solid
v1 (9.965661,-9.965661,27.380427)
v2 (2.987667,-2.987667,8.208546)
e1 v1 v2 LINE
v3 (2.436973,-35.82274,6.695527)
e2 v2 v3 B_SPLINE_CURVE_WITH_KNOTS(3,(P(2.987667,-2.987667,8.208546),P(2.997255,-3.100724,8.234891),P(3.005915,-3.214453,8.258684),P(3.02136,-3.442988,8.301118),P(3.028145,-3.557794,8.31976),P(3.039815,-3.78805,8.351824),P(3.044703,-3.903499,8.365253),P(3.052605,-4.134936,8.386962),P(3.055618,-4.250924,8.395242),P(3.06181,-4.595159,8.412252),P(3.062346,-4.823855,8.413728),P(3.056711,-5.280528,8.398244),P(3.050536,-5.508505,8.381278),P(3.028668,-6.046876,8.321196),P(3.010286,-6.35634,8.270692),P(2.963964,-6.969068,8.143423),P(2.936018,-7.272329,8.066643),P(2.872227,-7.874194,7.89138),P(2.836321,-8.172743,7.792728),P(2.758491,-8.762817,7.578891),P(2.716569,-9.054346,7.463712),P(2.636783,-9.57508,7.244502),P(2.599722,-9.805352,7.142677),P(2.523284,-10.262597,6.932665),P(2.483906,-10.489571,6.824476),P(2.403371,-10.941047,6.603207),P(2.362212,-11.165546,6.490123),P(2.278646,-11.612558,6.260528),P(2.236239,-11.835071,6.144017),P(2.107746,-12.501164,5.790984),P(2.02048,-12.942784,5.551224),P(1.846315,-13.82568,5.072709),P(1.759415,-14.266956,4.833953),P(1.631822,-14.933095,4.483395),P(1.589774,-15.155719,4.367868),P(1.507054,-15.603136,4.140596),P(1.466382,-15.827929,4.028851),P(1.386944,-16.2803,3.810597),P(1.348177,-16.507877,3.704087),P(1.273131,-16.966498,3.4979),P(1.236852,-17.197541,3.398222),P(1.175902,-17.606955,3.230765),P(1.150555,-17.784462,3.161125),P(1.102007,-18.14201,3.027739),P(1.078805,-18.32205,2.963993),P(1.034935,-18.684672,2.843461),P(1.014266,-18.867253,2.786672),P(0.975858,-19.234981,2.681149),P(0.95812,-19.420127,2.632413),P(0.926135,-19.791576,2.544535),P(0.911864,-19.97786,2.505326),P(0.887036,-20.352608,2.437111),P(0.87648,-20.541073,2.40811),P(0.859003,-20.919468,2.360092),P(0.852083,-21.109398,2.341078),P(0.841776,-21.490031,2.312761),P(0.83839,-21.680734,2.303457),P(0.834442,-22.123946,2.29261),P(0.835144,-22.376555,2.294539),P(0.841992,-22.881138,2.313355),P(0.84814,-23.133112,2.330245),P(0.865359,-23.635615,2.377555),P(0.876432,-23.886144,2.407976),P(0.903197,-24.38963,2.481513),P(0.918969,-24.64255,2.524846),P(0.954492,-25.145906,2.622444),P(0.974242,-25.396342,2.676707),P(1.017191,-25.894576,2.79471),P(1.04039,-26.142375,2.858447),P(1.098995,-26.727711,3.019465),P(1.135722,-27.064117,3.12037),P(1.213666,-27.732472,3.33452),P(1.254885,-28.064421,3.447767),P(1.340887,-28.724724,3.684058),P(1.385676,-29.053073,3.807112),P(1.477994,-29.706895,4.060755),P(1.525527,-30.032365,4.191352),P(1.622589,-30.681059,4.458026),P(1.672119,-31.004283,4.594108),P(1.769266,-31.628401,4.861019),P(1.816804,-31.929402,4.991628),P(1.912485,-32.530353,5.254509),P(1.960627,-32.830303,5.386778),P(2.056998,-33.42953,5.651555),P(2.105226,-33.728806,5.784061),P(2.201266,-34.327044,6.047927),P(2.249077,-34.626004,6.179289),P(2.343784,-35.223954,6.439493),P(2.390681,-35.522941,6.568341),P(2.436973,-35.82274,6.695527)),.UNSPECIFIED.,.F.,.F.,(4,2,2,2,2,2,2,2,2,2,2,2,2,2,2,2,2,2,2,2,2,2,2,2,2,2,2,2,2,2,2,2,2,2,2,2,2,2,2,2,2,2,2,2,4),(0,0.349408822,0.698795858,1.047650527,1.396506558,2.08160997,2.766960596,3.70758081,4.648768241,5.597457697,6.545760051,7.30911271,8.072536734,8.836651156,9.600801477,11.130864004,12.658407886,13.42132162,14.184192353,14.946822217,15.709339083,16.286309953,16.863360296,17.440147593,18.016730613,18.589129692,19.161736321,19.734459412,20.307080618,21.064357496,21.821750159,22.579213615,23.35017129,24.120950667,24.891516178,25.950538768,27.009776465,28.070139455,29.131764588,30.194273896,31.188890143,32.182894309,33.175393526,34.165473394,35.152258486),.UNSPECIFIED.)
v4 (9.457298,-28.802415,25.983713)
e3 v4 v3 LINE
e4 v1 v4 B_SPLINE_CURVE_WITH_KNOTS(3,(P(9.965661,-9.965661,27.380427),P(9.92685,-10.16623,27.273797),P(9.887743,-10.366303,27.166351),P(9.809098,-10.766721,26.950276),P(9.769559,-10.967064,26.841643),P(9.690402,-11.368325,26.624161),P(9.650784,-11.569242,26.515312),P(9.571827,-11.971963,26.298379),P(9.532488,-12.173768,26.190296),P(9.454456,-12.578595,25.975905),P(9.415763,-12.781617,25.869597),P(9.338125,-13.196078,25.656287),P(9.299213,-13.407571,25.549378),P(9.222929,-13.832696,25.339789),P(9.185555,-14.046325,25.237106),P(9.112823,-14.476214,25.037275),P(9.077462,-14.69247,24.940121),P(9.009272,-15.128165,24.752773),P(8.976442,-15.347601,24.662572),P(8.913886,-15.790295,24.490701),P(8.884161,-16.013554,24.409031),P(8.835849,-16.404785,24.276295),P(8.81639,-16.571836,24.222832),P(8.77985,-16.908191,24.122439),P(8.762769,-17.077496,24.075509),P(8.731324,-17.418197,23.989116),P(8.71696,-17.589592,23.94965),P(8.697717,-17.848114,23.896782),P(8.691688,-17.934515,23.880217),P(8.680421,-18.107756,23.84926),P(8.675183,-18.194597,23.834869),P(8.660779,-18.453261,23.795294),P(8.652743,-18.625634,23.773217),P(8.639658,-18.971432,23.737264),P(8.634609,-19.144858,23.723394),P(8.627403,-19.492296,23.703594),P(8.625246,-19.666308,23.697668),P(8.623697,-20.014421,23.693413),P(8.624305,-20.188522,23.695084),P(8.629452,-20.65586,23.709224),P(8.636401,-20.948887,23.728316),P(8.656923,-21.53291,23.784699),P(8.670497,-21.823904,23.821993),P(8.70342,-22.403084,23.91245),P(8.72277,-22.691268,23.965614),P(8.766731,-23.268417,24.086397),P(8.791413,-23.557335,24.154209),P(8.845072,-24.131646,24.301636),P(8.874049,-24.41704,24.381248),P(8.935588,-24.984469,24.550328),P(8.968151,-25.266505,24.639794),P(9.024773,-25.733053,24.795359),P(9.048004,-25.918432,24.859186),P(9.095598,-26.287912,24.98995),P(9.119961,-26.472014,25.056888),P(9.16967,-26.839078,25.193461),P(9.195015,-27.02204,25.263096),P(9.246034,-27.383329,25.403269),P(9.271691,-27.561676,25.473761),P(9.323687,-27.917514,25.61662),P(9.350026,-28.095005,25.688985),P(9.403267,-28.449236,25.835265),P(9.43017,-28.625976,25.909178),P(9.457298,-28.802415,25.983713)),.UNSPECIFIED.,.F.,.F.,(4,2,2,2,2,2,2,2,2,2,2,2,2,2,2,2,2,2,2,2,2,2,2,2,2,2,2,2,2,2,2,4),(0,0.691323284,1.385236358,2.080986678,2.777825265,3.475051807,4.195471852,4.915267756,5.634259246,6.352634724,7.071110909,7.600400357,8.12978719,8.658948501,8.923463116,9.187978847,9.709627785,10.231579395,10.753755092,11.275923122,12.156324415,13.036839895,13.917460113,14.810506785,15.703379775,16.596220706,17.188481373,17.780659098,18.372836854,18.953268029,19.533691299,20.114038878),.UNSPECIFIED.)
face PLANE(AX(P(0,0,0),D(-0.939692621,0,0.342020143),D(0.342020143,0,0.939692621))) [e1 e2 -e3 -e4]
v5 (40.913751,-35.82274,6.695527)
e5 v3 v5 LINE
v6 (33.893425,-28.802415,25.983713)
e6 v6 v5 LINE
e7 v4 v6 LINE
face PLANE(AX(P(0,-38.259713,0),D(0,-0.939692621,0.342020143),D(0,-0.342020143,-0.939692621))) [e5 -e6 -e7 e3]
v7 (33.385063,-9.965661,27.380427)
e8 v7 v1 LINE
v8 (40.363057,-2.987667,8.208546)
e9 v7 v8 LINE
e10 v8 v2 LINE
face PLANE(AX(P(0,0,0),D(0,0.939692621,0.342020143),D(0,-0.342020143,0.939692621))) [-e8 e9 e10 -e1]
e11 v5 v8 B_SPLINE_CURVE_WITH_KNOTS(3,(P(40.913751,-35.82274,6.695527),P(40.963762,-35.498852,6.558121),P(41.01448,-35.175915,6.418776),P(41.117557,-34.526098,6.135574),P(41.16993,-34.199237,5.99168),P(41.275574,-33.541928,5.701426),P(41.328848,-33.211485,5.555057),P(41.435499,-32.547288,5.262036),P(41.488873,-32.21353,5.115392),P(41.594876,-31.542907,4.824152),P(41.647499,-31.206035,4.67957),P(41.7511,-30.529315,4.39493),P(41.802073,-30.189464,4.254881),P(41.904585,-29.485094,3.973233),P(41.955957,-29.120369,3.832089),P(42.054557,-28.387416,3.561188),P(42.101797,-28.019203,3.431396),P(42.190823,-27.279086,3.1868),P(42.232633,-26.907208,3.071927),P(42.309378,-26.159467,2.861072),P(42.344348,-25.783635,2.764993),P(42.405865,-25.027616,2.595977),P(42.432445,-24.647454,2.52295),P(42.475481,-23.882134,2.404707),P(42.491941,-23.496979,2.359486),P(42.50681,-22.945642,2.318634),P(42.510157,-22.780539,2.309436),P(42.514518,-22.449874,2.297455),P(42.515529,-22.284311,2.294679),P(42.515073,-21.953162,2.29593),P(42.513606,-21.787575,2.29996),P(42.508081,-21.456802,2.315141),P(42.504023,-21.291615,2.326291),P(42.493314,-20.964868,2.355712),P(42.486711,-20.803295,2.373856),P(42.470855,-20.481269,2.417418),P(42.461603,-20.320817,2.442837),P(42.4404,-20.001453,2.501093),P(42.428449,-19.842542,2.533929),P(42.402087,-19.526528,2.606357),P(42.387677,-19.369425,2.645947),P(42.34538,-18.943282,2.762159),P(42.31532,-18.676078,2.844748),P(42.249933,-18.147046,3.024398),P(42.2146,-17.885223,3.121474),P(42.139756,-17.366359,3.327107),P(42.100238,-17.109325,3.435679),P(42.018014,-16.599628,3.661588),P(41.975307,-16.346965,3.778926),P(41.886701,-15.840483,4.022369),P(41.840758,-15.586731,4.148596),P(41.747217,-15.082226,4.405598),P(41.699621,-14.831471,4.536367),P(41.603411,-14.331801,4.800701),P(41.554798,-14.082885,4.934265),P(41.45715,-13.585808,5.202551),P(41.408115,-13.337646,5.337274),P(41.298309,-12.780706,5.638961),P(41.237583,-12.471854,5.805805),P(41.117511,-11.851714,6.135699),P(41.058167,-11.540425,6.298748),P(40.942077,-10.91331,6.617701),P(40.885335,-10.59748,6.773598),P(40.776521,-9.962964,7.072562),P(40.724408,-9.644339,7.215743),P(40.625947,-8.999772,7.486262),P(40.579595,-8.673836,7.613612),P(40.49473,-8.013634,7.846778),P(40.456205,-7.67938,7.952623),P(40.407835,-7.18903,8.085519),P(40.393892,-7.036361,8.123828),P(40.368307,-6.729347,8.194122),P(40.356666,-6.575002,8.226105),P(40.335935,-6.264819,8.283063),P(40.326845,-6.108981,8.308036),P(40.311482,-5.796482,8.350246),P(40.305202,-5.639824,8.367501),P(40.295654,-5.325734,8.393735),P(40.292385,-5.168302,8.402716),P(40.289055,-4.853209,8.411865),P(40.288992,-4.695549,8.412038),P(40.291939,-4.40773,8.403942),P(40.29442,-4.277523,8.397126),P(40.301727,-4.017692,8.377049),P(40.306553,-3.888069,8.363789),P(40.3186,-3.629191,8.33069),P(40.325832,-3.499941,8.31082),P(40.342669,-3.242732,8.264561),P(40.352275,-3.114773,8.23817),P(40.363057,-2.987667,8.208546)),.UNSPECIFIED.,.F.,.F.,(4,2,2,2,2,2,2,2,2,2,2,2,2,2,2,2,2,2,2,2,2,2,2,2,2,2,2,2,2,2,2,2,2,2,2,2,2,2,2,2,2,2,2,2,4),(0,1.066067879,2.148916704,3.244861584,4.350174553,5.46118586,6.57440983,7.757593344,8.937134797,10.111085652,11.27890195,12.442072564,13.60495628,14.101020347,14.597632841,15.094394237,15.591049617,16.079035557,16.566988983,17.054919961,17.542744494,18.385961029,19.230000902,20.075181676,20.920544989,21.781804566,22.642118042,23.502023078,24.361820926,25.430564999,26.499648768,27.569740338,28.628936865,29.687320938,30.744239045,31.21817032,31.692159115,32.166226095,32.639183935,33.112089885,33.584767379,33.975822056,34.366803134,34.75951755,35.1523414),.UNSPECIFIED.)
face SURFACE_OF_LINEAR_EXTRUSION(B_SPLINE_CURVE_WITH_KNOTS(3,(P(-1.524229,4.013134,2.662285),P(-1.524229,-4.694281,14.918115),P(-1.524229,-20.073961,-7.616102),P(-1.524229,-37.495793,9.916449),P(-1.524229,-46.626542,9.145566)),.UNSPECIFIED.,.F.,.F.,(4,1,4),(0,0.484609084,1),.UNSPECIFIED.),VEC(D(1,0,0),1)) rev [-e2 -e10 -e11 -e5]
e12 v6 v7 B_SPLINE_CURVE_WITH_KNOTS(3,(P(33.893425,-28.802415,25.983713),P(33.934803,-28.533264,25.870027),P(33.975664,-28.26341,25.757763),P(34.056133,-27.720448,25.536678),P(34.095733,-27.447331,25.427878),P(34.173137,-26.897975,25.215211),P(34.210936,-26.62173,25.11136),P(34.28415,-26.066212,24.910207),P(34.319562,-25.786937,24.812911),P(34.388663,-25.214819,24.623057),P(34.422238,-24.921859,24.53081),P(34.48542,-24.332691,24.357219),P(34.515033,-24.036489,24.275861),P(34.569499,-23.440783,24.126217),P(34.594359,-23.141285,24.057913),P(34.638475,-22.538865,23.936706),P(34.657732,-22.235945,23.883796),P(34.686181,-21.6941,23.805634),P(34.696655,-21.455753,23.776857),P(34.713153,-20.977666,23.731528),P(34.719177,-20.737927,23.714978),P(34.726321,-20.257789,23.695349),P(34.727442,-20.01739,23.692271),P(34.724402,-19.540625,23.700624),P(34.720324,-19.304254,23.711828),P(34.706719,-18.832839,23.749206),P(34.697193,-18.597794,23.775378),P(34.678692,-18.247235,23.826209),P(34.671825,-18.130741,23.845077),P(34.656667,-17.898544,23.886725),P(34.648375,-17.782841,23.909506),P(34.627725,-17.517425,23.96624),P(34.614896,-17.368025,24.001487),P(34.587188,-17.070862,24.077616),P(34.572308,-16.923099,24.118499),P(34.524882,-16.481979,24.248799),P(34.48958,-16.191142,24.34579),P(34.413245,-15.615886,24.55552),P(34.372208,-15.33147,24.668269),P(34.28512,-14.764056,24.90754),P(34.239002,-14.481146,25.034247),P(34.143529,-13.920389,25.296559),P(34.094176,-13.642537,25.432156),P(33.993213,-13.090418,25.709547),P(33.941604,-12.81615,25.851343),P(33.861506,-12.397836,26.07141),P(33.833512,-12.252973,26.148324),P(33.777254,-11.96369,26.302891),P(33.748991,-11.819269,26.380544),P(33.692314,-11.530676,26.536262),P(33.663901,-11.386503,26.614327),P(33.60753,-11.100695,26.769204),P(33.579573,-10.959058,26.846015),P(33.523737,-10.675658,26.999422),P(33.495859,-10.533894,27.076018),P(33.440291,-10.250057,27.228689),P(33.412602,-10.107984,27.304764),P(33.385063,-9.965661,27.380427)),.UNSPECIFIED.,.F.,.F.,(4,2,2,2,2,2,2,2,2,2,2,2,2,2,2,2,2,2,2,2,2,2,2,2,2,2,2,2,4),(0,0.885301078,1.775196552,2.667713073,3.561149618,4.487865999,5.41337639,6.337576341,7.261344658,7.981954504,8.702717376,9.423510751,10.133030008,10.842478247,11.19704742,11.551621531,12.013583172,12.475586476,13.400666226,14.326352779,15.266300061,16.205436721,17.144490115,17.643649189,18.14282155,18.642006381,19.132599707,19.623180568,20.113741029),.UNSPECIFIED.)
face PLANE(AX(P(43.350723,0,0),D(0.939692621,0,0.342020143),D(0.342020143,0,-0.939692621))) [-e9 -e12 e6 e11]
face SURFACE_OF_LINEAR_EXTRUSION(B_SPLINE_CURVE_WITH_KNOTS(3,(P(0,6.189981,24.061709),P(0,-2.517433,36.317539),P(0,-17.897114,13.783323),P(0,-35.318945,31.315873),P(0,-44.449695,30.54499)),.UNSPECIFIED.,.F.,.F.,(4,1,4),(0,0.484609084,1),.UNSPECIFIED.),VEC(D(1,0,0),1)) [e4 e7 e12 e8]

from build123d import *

# Parameters (mm, degrees)
F_1_FR_W        = 43.350723316
F_1_FR_H        = 38.259713105
EXTRUDE_1_DEPTH = 20
EXTRUDE_1_TAPER = 20
OTHER_START     = -1
OTHER_1_DEPTH   = 45
OTHER_START_2   = 7.279404685
OTHER_1_2_DEPTH = 28.791913946
OTHER_START_3   = -35.822740595
OTHER_1_3_DEPTH = 32.835074171


with BuildPart() as part:
    # Эскиз1_fr → Бобышка-Вытянуть1 (new body)
    with BuildSketch(Plane.XY):
        with Locations((21.675361658, -19.129856553)):
            Rectangle(F_1_FR_W, F_1_FR_H)
    extrude(amount=EXTRUDE_1_DEPTH, taper=EXTRUDE_1_TAPER)

    # Заменить грань1: read off the stored shape, not the designer's step
    # Заменить грань1 outline → Заменить грань1 (cut)
    with BuildSketch(Plane.YZ.offset(OTHER_START)):
        with BuildLine():
            Line((0, 0), (-2.987666524, 8.208546313))
            add(Edge.make_bspline(
                [(-2.987666524, 8.208546313), (-8.870550538, 9.578826995), (-19.207758762, -1.740918138), (-30.435430933, 4.410138177), (-35.822740495, 6.695527216)],
                knots=[0.134570032, 0.134570032, 0.134570032, 0.134570032, 0.484609084, 0.79490495, 0.79490495, 0.79490495, 0.79490495], degree=3))
            Line((-35.822740495, 6.695527216), (-38.259713105, 0))
            Line((-38.259713105, 0), (0, 0))
        make_face()
    extrude(amount=OTHER_1_DEPTH, mode=Mode.SUBTRACT)

    # Other 1 2 outline → Other 1 2 (add)
    with BuildSketch(Plane.YZ.offset(OTHER_START_2)):
        with BuildLine():
            Line((-7.279404685, 20), (-9.965660529, 27.380427273))
            add(Edge.make_bspline(
                [(-9.965660529, 27.380427273), (-12.601354954, 25.979247634), (-18.69943354, 22.300628932), (-25.092854244, 24.416589038), (-28.802415021, 25.983712933)],
                knots=[0.320991938, 0.320991938, 0.320991938, 0.320991938, 0.484609084, 0.701285336, 0.701285336, 0.701285336, 0.701285336], degree=3))
            Line((-28.802415021, 25.983712933), (-30.980308419, 20))
            Line((-30.980308419, 20), (-7.279404685, 20))
        make_face()
    extrude(amount=OTHER_1_2_DEPTH)

    # Other 1 3 outline → Other 1 3 (cut)
    with BuildSketch(Plane(origin=(0, 0, 0), x_dir=(1, 0, 0), z_dir=(0, 1, 0)).offset(OTHER_START_3)):
        Polygon((9.965660529, -27.380427273), (7.279404685, -20), (7.279404685, -29), (10.555136794, -29), align=None)
        Polygon((33.385062787, -27.380427273), (32.795586522, -29), (36.071318631, -29), (36.071318631, -20), align=None)
    extrude(amount=OTHER_1_3_DEPTH, mode=Mode.SUBTRACT)


solid = part.part
